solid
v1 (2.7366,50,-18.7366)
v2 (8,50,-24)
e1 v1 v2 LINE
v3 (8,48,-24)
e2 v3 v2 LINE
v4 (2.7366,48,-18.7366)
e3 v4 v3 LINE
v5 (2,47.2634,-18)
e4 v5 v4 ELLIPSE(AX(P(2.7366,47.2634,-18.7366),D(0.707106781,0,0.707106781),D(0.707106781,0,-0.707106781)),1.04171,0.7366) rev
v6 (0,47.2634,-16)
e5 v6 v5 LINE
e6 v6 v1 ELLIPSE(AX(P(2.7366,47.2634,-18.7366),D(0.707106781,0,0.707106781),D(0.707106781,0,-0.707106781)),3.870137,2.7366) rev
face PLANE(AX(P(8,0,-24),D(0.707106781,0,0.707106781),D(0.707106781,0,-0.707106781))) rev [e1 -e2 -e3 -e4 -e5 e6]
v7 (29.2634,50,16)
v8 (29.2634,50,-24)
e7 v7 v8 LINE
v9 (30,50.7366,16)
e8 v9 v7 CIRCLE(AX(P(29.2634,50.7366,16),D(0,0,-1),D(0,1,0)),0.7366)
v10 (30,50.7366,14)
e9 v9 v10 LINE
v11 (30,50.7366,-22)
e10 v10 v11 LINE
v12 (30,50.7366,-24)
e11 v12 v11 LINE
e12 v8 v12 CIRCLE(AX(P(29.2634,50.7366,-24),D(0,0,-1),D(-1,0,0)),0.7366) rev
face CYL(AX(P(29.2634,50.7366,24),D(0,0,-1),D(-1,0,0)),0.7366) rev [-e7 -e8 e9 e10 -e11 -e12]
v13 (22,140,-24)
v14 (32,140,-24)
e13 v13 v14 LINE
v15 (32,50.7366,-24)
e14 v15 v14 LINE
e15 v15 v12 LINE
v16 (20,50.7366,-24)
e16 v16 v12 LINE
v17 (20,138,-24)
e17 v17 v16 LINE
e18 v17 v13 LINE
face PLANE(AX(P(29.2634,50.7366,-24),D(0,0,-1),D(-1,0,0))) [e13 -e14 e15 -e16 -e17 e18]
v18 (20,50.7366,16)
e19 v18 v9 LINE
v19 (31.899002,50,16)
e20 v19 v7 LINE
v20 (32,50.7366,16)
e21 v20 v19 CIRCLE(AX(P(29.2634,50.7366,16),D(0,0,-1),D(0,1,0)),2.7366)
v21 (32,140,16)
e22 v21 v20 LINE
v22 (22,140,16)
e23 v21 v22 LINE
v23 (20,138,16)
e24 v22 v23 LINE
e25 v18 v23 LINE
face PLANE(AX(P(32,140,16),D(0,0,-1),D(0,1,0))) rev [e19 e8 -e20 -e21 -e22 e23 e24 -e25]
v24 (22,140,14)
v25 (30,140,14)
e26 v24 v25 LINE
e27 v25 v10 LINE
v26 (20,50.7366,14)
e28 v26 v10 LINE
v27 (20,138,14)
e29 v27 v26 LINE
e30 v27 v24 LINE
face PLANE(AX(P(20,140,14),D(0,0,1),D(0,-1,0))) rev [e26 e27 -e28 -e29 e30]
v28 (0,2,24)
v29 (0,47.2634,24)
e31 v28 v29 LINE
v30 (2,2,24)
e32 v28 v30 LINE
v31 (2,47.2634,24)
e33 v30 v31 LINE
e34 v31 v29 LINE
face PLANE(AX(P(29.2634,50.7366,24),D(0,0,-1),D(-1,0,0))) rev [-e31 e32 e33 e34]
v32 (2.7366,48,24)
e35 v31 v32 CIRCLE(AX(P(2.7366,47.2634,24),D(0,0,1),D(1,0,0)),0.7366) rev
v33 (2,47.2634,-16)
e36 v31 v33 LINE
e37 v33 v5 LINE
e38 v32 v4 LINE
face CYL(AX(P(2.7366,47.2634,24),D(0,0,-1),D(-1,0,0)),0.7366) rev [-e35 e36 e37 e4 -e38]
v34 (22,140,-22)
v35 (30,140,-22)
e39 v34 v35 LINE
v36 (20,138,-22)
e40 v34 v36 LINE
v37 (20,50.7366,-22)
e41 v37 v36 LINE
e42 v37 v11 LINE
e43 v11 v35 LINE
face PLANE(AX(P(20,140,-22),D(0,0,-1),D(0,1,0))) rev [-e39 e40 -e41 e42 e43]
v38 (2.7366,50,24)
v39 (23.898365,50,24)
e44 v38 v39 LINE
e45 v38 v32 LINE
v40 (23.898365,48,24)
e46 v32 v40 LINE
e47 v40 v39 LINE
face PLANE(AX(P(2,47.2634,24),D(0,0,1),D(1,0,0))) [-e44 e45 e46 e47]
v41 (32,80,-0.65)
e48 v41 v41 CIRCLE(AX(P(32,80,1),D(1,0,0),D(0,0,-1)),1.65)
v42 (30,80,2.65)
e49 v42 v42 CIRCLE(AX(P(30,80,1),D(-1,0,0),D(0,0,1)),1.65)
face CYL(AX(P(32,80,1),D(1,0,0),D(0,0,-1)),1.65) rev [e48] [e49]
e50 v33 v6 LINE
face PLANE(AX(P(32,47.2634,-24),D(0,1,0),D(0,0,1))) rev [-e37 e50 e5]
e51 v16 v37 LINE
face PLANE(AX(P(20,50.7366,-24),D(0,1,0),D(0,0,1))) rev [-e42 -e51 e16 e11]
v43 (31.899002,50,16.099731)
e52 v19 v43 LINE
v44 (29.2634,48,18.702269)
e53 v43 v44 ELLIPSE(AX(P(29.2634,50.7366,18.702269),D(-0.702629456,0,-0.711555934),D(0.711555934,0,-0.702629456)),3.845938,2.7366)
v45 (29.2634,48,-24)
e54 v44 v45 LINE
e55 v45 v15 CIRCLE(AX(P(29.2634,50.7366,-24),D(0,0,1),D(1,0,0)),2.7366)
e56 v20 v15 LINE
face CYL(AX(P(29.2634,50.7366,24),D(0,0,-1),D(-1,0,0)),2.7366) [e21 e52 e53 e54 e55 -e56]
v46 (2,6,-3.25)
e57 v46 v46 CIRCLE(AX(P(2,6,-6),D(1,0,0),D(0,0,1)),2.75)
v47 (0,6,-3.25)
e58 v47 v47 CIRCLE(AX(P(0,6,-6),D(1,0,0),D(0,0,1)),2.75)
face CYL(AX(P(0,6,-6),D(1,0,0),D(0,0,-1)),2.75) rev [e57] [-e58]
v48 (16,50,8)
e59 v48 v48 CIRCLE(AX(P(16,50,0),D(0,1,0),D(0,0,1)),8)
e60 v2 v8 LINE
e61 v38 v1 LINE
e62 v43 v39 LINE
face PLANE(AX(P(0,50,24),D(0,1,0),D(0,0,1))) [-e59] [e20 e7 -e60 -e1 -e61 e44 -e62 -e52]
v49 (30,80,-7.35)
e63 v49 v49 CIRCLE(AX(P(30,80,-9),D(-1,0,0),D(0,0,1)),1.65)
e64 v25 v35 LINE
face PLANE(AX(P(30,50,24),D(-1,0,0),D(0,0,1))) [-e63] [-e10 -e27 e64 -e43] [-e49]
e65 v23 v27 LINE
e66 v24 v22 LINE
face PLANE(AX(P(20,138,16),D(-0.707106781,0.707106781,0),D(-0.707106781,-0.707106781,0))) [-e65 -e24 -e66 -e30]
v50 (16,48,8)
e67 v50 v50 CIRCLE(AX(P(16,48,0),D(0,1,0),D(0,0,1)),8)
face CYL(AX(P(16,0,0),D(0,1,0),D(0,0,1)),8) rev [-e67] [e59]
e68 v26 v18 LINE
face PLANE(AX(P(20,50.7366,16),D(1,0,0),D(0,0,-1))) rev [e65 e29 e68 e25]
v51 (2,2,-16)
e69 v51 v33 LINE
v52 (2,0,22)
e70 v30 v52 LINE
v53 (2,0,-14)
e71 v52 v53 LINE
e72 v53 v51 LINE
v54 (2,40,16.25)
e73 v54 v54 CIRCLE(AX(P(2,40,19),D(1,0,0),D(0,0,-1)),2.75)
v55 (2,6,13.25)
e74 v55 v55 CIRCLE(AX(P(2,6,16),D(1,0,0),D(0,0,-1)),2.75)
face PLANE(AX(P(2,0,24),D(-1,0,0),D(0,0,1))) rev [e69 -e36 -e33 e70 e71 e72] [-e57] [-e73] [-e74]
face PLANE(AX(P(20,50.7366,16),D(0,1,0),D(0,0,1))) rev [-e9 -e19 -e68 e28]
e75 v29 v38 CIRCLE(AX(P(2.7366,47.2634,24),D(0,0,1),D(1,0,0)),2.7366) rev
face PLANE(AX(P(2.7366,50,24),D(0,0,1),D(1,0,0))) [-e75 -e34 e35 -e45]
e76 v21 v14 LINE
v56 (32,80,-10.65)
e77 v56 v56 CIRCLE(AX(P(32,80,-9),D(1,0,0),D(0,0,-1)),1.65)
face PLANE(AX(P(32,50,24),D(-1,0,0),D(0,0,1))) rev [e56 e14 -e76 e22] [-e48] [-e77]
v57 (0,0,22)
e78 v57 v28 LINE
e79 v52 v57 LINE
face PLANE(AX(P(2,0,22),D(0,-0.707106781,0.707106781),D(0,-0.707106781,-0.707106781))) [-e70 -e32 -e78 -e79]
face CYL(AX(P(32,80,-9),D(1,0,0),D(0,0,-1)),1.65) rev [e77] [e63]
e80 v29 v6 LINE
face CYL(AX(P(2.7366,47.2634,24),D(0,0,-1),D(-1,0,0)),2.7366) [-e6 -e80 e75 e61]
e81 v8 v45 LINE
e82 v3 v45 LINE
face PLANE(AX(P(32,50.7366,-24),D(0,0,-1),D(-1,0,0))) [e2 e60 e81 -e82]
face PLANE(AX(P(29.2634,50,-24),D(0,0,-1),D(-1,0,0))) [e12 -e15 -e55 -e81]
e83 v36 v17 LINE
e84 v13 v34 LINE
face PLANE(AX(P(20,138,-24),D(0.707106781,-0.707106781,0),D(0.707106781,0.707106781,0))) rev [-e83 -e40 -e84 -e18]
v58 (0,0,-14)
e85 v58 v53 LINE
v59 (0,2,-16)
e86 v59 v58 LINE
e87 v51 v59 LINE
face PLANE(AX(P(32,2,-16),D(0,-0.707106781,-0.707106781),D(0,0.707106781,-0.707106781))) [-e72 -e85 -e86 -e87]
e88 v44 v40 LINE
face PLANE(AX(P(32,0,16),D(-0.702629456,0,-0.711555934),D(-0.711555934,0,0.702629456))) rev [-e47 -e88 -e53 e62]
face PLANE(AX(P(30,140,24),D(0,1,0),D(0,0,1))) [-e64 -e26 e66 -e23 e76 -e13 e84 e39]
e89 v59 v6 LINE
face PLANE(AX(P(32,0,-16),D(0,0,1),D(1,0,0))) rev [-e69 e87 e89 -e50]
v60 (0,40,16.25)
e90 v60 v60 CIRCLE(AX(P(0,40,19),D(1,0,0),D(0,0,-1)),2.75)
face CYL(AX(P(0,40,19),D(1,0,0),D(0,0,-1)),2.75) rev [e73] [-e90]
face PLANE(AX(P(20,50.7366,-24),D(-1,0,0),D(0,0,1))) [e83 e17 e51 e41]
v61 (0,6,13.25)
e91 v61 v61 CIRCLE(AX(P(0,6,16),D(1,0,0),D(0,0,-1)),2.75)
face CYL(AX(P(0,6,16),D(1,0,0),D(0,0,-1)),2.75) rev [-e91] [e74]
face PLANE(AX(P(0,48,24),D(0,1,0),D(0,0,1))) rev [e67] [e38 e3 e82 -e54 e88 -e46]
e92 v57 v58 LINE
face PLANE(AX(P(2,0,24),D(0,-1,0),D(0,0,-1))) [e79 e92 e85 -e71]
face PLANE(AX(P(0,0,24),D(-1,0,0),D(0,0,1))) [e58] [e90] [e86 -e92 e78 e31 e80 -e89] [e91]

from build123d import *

# Parameters (mm, degrees)
SM_BASE_FLANGE_1_DEPTH = 24
SKETCH_3_R             = 2.75
CUT_EXTRUDE_1_DEPTH    = 146.175755552
SKETCH_4_W             = 8
SKETCH_4_H             = 90
SKETCH_4_H_2           = 47.2634
CUT_EXTRUDE_2_DEPTH    = 146.602197786
CUT_EXTRUDE_3_DEPTH    = 99.488578018
SKETCH_9_W             = 2
SKETCH_9_H             = 89.2634
EXTRUDE_1_DEPTH        = 10
CHAMFER_1_SIZE         = 2
M4X0_7_1_D             = 3.3
M4X0_7_1_DEPTH         = 10.1
M4X0_7_1_TIP           = 0.991420021
SKETCH_12_R            = 8
CUT_EXTRUDE_4_DEPTH    = 99.488578018
SKETCH_13_R            = 2.75
CUT_EXTRUDE_5_DEPTH    = 146.175755552


# Sheet-metal steps are written as plain solids
with BuildPart() as part:
    # Sketch 1 → 基体-法兰1 (new, symmetric)
    with BuildSketch(Plane.XY):
        with BuildLine():
            Line((0, 0), (0, 47.2634))
            ThreePointArc((0, 47.2634), (0.801531583, 49.198468417), (2.7366, 50))
            Line((2.7366, 50), (29.2634, 50))
            ThreePointArc((29.2634, 50), (29.784254855, 50.215745145), (30, 50.7366))
            Line((30, 50.7366), (30, 140))
            Line((30, 140), (32, 140))
            Line((32, 140), (32, 50.7366))
            ThreePointArc((32, 50.7366), (31.198468417, 48.801531583), (29.2634, 48))
            Line((29.2634, 48), (2.7366, 48))
            ThreePointArc((2.7366, 48), (2.215745145, 47.784254855), (2, 47.2634))
            Line((2, 47.2634), (2, 0))
            Line((2, 0), (0, 0))
        make_face()
    extrude(amount=SM_BASE_FLANGE_1_DEPTH, both=True)

    # 草图3 → 切除-拉伸1 (cut, through all)
    with BuildSketch(Plane(origin=(2, 0, 0), x_dir=(0, 0, -1), z_dir=(1, 0, 0))):
        with Locations((-16, 6)):
            Circle(SKETCH_3_R)
        with Locations(Location((6, 6, 0), (0, 0, 180))):
            Circle(SKETCH_3_R)
    extrude(amount=-CUT_EXTRUDE_1_DEPTH, mode=Mode.SUBTRACT)

    # 草图4 → 切除-拉伸2 (cut, through all)
    with BuildSketch(Plane.ZY):
        with Locations((20, 95)):
            Rectangle(SKETCH_4_W, SKETCH_4_H)
        with Locations((-20, 23.6317)):
            Rectangle(SKETCH_4_W, SKETCH_4_H_2)
    extrude(amount=-CUT_EXTRUDE_2_DEPTH, mode=Mode.SUBTRACT)

    # 草图5 → 切除-拉伸3 (cut, through all)
    with BuildSketch(Plane(origin=(0, 50, 0), x_dir=(1, 0, 0), z_dir=(0, 1, 0))):
        Polygon((0, 24), (8, 24), (0, 16), align=None)
        Polygon((32, -16), (23.898364891, -24), (31.899002398, -24), align=None)
    extrude(amount=-CUT_EXTRUDE_3_DEPTH, mode=Mode.SUBTRACT)

    # 草图9 → 凸台-拉伸1 (add)
    with BuildSketch(Plane.ZY.offset(-30)):
        with Locations((-23, 95.3683)):
            Rectangle(SKETCH_9_W, SKETCH_9_H)
        with Locations((15, 95.3683)):
            Rectangle(SKETCH_9_W, SKETCH_9_H)
    extrude(amount=EXTRUDE_1_DEPTH)

    # 倒角1
    chamfer_1_edges = [part.edges().sort_by_distance(p)[0] for p in [
        (20, 140, -23),
        (20, 140, 15),
        (1, 0, 24),
        (1, 0, -16),
    ]]
    chamfer(chamfer_1_edges, length=CHAMFER_1_SIZE)

    # M4x0.7 螺纹孔1
    with Locations(Plane(origin=(32, 0, 0), x_dir=(0, 0, -1), z_dir=(1, 0, 0))):
        with Locations((-1, 80), (9, 80)):
            Hole(M4X0_7_1_D / 2, depth=M4X0_7_1_DEPTH)
            with Locations((0, 0, -(M4X0_7_1_DEPTH + M4X0_7_1_TIP / 2))):  # 118° drill point
                Cone(0, M4X0_7_1_D / 2, M4X0_7_1_TIP, mode=Mode.SUBTRACT)

    # 草图12 → 切除-拉伸4 (cut, through all)
    with BuildSketch(Plane(origin=(0, 50, 0), x_dir=(1, 0, 0), z_dir=(0, 1, 0))):
        with Locations(Location((16, 0, 0), (0, 0, 270))):
            Circle(SKETCH_12_R)
    extrude(amount=-CUT_EXTRUDE_4_DEPTH, mode=Mode.SUBTRACT)

    # 草图13 → 切除-拉伸5 (cut, through all)
    with BuildSketch(Plane(origin=(2, 0, 0), x_dir=(0, 0, -1), z_dir=(1, 0, 0))):
        with Locations((-19, 40)):
            Circle(SKETCH_13_R)
    extrude(amount=-CUT_EXTRUDE_5_DEPTH, mode=Mode.SUBTRACT)


solid = part.part
